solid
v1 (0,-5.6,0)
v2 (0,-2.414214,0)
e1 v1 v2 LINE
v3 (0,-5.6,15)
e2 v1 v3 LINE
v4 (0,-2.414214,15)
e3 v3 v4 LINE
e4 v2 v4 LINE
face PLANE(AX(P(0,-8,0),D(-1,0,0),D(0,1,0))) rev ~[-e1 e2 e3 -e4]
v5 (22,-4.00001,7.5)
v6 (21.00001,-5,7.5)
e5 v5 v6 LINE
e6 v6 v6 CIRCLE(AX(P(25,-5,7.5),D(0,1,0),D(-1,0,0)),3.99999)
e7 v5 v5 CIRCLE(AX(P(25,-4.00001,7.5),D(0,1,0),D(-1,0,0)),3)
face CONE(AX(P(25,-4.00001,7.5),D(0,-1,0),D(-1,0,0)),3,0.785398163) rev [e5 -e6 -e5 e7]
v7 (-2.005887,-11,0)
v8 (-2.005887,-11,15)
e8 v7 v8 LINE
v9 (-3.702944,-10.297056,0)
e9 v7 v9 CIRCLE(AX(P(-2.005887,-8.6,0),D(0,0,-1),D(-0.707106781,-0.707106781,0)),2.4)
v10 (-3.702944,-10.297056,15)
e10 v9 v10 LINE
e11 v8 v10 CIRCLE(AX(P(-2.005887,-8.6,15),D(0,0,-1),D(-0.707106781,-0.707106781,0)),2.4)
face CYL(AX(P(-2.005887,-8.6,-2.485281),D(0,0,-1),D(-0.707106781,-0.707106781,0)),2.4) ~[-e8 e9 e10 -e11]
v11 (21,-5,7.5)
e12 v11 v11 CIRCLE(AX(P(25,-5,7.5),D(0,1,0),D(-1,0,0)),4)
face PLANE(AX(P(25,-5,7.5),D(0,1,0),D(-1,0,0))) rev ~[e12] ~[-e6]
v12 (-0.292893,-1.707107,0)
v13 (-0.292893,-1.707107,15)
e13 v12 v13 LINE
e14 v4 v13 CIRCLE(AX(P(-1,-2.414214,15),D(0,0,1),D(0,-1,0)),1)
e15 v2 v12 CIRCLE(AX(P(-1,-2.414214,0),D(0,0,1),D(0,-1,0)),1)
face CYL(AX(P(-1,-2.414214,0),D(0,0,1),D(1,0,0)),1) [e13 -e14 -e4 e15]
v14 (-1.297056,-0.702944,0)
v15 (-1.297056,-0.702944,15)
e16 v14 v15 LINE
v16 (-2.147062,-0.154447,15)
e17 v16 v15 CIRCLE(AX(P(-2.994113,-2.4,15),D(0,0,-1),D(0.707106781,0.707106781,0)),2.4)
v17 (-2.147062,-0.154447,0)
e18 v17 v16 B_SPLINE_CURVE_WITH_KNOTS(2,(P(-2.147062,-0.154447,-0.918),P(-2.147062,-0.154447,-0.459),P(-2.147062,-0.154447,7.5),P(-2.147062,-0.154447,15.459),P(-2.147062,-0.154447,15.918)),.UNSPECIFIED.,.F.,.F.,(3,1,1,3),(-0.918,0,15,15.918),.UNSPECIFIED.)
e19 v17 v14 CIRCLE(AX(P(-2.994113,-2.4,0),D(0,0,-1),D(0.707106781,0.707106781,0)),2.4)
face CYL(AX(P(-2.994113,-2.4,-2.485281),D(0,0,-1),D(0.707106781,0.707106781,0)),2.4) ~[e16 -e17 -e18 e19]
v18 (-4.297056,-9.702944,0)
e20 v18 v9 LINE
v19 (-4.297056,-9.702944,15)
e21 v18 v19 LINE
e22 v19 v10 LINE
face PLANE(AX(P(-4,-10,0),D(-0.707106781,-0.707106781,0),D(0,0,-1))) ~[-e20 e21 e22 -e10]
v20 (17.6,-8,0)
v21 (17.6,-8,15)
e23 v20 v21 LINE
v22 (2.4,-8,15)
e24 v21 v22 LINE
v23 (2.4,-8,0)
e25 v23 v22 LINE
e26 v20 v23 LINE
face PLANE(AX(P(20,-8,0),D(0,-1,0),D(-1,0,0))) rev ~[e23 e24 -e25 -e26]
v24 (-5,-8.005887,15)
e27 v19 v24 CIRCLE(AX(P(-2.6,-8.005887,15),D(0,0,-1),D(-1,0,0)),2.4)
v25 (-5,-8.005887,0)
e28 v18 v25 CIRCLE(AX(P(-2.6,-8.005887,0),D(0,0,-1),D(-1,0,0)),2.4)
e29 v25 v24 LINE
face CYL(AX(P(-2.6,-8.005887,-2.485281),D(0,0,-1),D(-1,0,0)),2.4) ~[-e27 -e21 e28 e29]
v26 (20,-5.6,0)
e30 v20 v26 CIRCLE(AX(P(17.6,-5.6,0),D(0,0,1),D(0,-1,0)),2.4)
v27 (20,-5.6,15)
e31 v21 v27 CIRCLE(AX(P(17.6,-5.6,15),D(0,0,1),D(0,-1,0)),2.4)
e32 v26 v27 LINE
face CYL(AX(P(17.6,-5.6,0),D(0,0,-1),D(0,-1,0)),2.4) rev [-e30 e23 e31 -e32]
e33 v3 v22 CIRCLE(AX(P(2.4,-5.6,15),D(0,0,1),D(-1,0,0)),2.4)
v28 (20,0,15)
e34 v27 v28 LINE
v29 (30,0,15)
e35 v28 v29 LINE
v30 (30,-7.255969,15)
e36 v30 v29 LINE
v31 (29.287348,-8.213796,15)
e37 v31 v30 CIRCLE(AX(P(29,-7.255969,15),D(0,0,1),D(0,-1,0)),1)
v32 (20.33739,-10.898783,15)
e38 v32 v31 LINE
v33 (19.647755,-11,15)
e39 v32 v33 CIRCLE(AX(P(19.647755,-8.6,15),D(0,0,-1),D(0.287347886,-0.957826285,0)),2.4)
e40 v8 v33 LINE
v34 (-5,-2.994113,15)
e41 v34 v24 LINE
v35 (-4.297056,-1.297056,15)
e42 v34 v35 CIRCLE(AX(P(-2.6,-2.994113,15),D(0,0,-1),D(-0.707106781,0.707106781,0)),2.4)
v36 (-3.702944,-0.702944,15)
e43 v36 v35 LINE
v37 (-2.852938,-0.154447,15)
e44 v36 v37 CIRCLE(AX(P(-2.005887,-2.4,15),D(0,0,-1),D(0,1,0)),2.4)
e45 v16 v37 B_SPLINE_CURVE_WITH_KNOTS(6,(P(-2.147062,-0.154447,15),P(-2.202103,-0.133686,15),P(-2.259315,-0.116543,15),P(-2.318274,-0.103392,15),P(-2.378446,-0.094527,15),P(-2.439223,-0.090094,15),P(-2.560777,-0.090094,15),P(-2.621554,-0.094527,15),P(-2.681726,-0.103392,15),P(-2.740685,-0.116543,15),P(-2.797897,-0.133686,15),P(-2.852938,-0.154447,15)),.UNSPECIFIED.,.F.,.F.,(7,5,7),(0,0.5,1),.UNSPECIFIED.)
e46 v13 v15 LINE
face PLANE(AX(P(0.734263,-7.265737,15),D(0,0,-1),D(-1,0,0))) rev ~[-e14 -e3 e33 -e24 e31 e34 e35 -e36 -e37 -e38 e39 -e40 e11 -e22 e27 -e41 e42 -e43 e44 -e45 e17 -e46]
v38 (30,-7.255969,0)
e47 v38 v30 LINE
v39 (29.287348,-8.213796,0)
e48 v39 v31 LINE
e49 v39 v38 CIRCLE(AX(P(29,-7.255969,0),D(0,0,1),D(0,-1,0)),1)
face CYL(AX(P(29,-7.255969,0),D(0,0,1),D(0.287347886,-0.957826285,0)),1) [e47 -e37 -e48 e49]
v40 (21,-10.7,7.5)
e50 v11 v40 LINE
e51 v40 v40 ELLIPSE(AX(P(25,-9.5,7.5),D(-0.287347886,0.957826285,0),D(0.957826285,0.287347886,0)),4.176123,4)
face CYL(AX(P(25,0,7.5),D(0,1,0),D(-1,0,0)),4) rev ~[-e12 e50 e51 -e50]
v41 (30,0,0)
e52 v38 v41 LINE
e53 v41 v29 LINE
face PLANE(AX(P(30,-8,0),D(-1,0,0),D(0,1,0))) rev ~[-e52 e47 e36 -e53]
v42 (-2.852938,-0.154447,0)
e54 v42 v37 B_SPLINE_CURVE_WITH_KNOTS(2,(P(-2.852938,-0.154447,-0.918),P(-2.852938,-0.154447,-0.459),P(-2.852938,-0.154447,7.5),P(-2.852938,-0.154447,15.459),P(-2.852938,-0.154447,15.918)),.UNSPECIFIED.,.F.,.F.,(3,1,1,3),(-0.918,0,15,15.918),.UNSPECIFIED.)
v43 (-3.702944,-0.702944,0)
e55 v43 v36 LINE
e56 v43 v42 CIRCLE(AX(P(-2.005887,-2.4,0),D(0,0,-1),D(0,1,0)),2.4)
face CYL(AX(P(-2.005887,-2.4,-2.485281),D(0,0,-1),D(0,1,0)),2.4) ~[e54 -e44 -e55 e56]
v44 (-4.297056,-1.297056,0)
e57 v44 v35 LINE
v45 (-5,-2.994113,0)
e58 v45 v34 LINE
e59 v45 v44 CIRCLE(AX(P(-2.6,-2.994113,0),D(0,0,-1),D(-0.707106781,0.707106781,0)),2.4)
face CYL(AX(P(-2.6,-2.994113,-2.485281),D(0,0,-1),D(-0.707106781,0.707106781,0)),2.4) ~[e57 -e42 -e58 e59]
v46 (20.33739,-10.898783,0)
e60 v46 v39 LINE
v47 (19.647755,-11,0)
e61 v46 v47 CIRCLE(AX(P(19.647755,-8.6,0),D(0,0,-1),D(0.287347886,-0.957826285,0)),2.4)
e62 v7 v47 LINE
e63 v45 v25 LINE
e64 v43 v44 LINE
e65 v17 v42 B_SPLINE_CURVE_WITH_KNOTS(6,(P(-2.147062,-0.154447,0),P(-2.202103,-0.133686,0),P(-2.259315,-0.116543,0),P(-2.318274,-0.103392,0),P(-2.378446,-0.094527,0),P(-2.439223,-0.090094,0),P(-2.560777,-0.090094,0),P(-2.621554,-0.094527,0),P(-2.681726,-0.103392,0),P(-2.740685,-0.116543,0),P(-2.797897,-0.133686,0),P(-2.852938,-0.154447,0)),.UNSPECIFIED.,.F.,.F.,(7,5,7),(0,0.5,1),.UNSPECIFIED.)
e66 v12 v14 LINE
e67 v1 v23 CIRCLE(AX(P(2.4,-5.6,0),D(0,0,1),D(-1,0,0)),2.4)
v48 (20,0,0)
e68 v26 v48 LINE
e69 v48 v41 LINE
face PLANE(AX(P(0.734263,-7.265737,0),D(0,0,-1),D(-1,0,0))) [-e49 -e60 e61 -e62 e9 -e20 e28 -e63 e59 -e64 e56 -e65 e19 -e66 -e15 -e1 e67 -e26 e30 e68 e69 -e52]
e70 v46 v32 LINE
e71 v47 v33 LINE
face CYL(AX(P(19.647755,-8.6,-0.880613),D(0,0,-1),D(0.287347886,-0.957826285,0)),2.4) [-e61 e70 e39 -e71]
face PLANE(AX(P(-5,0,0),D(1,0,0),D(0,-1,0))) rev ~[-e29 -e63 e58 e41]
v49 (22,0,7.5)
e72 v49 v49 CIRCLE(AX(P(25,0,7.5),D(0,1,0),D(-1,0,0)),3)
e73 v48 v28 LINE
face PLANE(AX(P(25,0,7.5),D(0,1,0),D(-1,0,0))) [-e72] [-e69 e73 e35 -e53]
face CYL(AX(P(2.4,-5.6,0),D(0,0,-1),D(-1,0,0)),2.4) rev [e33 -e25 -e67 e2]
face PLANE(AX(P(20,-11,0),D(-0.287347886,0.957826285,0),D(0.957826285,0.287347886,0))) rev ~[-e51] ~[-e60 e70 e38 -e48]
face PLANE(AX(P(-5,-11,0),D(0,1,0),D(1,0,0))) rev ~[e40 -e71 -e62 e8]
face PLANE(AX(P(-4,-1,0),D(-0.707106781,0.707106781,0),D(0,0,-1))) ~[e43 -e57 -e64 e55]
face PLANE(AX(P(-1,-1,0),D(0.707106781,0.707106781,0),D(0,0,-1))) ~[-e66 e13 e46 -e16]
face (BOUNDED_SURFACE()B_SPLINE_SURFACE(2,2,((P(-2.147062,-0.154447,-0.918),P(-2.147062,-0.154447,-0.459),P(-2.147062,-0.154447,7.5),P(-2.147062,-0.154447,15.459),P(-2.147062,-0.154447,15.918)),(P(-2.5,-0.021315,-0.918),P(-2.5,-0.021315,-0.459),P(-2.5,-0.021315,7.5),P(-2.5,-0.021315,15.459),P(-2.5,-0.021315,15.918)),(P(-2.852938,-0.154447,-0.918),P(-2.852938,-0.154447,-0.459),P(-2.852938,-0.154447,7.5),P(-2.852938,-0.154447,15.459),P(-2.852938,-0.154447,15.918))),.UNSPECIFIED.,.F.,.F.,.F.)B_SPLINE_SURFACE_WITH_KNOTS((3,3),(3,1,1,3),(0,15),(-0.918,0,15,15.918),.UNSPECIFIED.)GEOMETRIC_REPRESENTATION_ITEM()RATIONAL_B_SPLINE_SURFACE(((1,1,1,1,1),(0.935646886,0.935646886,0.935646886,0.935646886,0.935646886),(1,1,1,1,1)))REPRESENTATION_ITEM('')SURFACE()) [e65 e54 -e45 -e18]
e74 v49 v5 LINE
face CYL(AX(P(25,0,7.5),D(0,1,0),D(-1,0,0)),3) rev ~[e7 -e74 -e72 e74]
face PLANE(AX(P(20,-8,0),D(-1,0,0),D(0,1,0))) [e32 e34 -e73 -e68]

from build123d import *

# Parameters (mm, degrees)
F0_W        = 10
F0_H        = 8
F1_DEPTH    = 15
F2_R        = 4
F2_R_2      = 3
F3_DEPTH    = 25
F4_DEPTH    = 5
F5_SIZE     = 0.99999
F6_SIZE     = 2
F7_T1_DEPTH = 15
F7_T3_DEPTH = 19.9705627485
F7_T5_DEPTH = 16.7612260356
F8_R        = 1


# Not quite as in the source:
# - a fillet or chamfer that OpenCascade refuses, or shapes differently, is made with other operations: its cross-section is extruded or revolved along the edge and cut away or added
# - a fillet or chamfer is up to 0.001 mm smaller than in the source, because OpenCascade refuses the exact size


with BuildPart() as f1:
    # F0 (on Top) → F1 (new body)
    with BuildSketch(Plane.XY):
        Polygon((20, -8), (0, -8), (0, 0), (-5, 0), (-5, -11), (20, -11), align=None)
        with Locations((25, -4)):
            Rectangle(F0_W, F0_H)
        Polygon((30, -8), (20, -8), (20, -11), align=None)
    extrude(amount=F1_DEPTH)

    # F2 (on face) → F3 (cut)
    with BuildSketch(Plane(origin=(0, 0, 0), x_dir=(-1, 0, 0), z_dir=(0, 1, 0))):
        with Locations((-25, 7.5)):
            Circle(F2_R)
        with Locations((-25, 7.5)):
            Circle(F2_R_2, mode=Mode.SUBTRACT)
        with Locations((-25, 7.5)):
            Circle(F2_R_2)
    extrude(amount=-F3_DEPTH, mode=Mode.SUBTRACT)

    # F2 (on face) → F4 (join)
    with BuildSketch(Plane(origin=(0, 0, 0), x_dir=(-1, 0, 0), z_dir=(0, 1, 0))):
        with Locations((-25, 7.5)):
            Circle(F2_R)
        with Locations((-25, 7.5)):
            Circle(F2_R_2, mode=Mode.SUBTRACT)
    extrude(amount=-F4_DEPTH)

    # F5 (size 1 in the source; OpenCascade refuses exactly that, so slightly less here)
    f5_edges = [f1.edges().sort_by_distance(p)[0] for p in [
        (28, -5, 7.5),
    ]]
    chamfer(f5_edges, length=F5_SIZE)

    # F6
    f6_edges = [f1.edges().sort_by_distance(p)[0] for p in [
        (-5, 0, 7.5),
        (0, 0, 7.5),
        (-5, -11, 7.5),
    ]]
    chamfer(f6_edges, length=F6_SIZE)

    # F7: fillet of radius 2.4 on 8 edges, made by hand

    # F7_s2 → F7_t1 (join)
    with BuildSketch(Plane.XY):
        with BuildLine():
            ThreePointArc((0, -5.6), (0.7029437252, -7.2970562748), (2.4, -8))
            Line((2.4, -8), (0, -8))
            Line((0, -8), (0, -5.6))
        make_face()
        with BuildLine():
            ThreePointArc((17.6, -8), (19.2970562748, -7.2970562748), (20, -5.6))
            Line((20, -5.6), (20, -8))
            Line((20, -8), (17.6, -8))
        make_face()
    extrude(amount=F7_T1_DEPTH)

    # F7_s4 → F7_t3 (cut)
    with BuildSketch(Plane.XY.offset(-2.4852813742)):
        with BuildLine():
            ThreePointArc((-1.2970562748, -0.7029437252), (-2.075672312, -0.182689122), (-2.9941125497, 0))
            Line((-2.9941125497, 0), (-2, 0))
            Line((-2, 0), (-1.2970562748, -0.7029437252))
        make_face()
        with BuildLine():
            ThreePointArc((-2.0058874503, 0), (-2.924327688, -0.182689122), (-3.7029437252, -0.7029437252))
            Line((-3.7029437252, -0.7029437252), (-3, 0))
            Line((-3, 0), (-2.0058874503, 0))
        make_face()
        with BuildLine():
            ThreePointArc((-4.2970562748, -1.2970562748), (-4.817310878, -2.075672312), (-5, -2.9941125497))
            Line((-5, -2.9941125497), (-5, -2))
            Line((-5, -2), (-4.2970562748, -1.2970562748))
        make_face()
        with BuildLine():
            ThreePointArc((-5, -8.0058874503), (-4.817310878, -8.924327688), (-4.2970562748, -9.7029437252))
            Line((-4.2970562748, -9.7029437252), (-5, -9))
            Line((-5, -9), (-5, -8.0058874503))
        make_face()
        with BuildLine():
            ThreePointArc((-3.7029437252, -10.2970562748), (-2.924327688, -10.817310878), (-2.0058874503, -11))
            Line((-2.0058874503, -11), (-3, -11))
            Line((-3, -11), (-3.7029437252, -10.2970562748))
        make_face()
    extrude(amount=F7_T3_DEPTH, mode=Mode.SUBTRACT)

    # F7_s6 → F7_t5 (cut)
    with BuildSketch(Plane.XY.offset(-0.8806130178)):
        with BuildLine():
            ThreePointArc((20.3373897182, -10.8987830845), (19.9962663401, -10.9745609492), (19.6477547929, -11))
            Line((19.6477547929, -11), (20, -11))
            Line((20, -11), (20.3373897182, -10.8987830845))
        make_face()
    extrude(amount=F7_T5_DEPTH, mode=Mode.SUBTRACT)

    # F8
    f8_edges = [f1.edges().sort_by_distance(p)[0] for p in [
        (-2.5, -0.051415, 7.5),
        (0, -2, 7.5),
        (30, -8, 7.5),
    ]]
    fillet(f8_edges, radius=F8_R)


solid = f1.part
